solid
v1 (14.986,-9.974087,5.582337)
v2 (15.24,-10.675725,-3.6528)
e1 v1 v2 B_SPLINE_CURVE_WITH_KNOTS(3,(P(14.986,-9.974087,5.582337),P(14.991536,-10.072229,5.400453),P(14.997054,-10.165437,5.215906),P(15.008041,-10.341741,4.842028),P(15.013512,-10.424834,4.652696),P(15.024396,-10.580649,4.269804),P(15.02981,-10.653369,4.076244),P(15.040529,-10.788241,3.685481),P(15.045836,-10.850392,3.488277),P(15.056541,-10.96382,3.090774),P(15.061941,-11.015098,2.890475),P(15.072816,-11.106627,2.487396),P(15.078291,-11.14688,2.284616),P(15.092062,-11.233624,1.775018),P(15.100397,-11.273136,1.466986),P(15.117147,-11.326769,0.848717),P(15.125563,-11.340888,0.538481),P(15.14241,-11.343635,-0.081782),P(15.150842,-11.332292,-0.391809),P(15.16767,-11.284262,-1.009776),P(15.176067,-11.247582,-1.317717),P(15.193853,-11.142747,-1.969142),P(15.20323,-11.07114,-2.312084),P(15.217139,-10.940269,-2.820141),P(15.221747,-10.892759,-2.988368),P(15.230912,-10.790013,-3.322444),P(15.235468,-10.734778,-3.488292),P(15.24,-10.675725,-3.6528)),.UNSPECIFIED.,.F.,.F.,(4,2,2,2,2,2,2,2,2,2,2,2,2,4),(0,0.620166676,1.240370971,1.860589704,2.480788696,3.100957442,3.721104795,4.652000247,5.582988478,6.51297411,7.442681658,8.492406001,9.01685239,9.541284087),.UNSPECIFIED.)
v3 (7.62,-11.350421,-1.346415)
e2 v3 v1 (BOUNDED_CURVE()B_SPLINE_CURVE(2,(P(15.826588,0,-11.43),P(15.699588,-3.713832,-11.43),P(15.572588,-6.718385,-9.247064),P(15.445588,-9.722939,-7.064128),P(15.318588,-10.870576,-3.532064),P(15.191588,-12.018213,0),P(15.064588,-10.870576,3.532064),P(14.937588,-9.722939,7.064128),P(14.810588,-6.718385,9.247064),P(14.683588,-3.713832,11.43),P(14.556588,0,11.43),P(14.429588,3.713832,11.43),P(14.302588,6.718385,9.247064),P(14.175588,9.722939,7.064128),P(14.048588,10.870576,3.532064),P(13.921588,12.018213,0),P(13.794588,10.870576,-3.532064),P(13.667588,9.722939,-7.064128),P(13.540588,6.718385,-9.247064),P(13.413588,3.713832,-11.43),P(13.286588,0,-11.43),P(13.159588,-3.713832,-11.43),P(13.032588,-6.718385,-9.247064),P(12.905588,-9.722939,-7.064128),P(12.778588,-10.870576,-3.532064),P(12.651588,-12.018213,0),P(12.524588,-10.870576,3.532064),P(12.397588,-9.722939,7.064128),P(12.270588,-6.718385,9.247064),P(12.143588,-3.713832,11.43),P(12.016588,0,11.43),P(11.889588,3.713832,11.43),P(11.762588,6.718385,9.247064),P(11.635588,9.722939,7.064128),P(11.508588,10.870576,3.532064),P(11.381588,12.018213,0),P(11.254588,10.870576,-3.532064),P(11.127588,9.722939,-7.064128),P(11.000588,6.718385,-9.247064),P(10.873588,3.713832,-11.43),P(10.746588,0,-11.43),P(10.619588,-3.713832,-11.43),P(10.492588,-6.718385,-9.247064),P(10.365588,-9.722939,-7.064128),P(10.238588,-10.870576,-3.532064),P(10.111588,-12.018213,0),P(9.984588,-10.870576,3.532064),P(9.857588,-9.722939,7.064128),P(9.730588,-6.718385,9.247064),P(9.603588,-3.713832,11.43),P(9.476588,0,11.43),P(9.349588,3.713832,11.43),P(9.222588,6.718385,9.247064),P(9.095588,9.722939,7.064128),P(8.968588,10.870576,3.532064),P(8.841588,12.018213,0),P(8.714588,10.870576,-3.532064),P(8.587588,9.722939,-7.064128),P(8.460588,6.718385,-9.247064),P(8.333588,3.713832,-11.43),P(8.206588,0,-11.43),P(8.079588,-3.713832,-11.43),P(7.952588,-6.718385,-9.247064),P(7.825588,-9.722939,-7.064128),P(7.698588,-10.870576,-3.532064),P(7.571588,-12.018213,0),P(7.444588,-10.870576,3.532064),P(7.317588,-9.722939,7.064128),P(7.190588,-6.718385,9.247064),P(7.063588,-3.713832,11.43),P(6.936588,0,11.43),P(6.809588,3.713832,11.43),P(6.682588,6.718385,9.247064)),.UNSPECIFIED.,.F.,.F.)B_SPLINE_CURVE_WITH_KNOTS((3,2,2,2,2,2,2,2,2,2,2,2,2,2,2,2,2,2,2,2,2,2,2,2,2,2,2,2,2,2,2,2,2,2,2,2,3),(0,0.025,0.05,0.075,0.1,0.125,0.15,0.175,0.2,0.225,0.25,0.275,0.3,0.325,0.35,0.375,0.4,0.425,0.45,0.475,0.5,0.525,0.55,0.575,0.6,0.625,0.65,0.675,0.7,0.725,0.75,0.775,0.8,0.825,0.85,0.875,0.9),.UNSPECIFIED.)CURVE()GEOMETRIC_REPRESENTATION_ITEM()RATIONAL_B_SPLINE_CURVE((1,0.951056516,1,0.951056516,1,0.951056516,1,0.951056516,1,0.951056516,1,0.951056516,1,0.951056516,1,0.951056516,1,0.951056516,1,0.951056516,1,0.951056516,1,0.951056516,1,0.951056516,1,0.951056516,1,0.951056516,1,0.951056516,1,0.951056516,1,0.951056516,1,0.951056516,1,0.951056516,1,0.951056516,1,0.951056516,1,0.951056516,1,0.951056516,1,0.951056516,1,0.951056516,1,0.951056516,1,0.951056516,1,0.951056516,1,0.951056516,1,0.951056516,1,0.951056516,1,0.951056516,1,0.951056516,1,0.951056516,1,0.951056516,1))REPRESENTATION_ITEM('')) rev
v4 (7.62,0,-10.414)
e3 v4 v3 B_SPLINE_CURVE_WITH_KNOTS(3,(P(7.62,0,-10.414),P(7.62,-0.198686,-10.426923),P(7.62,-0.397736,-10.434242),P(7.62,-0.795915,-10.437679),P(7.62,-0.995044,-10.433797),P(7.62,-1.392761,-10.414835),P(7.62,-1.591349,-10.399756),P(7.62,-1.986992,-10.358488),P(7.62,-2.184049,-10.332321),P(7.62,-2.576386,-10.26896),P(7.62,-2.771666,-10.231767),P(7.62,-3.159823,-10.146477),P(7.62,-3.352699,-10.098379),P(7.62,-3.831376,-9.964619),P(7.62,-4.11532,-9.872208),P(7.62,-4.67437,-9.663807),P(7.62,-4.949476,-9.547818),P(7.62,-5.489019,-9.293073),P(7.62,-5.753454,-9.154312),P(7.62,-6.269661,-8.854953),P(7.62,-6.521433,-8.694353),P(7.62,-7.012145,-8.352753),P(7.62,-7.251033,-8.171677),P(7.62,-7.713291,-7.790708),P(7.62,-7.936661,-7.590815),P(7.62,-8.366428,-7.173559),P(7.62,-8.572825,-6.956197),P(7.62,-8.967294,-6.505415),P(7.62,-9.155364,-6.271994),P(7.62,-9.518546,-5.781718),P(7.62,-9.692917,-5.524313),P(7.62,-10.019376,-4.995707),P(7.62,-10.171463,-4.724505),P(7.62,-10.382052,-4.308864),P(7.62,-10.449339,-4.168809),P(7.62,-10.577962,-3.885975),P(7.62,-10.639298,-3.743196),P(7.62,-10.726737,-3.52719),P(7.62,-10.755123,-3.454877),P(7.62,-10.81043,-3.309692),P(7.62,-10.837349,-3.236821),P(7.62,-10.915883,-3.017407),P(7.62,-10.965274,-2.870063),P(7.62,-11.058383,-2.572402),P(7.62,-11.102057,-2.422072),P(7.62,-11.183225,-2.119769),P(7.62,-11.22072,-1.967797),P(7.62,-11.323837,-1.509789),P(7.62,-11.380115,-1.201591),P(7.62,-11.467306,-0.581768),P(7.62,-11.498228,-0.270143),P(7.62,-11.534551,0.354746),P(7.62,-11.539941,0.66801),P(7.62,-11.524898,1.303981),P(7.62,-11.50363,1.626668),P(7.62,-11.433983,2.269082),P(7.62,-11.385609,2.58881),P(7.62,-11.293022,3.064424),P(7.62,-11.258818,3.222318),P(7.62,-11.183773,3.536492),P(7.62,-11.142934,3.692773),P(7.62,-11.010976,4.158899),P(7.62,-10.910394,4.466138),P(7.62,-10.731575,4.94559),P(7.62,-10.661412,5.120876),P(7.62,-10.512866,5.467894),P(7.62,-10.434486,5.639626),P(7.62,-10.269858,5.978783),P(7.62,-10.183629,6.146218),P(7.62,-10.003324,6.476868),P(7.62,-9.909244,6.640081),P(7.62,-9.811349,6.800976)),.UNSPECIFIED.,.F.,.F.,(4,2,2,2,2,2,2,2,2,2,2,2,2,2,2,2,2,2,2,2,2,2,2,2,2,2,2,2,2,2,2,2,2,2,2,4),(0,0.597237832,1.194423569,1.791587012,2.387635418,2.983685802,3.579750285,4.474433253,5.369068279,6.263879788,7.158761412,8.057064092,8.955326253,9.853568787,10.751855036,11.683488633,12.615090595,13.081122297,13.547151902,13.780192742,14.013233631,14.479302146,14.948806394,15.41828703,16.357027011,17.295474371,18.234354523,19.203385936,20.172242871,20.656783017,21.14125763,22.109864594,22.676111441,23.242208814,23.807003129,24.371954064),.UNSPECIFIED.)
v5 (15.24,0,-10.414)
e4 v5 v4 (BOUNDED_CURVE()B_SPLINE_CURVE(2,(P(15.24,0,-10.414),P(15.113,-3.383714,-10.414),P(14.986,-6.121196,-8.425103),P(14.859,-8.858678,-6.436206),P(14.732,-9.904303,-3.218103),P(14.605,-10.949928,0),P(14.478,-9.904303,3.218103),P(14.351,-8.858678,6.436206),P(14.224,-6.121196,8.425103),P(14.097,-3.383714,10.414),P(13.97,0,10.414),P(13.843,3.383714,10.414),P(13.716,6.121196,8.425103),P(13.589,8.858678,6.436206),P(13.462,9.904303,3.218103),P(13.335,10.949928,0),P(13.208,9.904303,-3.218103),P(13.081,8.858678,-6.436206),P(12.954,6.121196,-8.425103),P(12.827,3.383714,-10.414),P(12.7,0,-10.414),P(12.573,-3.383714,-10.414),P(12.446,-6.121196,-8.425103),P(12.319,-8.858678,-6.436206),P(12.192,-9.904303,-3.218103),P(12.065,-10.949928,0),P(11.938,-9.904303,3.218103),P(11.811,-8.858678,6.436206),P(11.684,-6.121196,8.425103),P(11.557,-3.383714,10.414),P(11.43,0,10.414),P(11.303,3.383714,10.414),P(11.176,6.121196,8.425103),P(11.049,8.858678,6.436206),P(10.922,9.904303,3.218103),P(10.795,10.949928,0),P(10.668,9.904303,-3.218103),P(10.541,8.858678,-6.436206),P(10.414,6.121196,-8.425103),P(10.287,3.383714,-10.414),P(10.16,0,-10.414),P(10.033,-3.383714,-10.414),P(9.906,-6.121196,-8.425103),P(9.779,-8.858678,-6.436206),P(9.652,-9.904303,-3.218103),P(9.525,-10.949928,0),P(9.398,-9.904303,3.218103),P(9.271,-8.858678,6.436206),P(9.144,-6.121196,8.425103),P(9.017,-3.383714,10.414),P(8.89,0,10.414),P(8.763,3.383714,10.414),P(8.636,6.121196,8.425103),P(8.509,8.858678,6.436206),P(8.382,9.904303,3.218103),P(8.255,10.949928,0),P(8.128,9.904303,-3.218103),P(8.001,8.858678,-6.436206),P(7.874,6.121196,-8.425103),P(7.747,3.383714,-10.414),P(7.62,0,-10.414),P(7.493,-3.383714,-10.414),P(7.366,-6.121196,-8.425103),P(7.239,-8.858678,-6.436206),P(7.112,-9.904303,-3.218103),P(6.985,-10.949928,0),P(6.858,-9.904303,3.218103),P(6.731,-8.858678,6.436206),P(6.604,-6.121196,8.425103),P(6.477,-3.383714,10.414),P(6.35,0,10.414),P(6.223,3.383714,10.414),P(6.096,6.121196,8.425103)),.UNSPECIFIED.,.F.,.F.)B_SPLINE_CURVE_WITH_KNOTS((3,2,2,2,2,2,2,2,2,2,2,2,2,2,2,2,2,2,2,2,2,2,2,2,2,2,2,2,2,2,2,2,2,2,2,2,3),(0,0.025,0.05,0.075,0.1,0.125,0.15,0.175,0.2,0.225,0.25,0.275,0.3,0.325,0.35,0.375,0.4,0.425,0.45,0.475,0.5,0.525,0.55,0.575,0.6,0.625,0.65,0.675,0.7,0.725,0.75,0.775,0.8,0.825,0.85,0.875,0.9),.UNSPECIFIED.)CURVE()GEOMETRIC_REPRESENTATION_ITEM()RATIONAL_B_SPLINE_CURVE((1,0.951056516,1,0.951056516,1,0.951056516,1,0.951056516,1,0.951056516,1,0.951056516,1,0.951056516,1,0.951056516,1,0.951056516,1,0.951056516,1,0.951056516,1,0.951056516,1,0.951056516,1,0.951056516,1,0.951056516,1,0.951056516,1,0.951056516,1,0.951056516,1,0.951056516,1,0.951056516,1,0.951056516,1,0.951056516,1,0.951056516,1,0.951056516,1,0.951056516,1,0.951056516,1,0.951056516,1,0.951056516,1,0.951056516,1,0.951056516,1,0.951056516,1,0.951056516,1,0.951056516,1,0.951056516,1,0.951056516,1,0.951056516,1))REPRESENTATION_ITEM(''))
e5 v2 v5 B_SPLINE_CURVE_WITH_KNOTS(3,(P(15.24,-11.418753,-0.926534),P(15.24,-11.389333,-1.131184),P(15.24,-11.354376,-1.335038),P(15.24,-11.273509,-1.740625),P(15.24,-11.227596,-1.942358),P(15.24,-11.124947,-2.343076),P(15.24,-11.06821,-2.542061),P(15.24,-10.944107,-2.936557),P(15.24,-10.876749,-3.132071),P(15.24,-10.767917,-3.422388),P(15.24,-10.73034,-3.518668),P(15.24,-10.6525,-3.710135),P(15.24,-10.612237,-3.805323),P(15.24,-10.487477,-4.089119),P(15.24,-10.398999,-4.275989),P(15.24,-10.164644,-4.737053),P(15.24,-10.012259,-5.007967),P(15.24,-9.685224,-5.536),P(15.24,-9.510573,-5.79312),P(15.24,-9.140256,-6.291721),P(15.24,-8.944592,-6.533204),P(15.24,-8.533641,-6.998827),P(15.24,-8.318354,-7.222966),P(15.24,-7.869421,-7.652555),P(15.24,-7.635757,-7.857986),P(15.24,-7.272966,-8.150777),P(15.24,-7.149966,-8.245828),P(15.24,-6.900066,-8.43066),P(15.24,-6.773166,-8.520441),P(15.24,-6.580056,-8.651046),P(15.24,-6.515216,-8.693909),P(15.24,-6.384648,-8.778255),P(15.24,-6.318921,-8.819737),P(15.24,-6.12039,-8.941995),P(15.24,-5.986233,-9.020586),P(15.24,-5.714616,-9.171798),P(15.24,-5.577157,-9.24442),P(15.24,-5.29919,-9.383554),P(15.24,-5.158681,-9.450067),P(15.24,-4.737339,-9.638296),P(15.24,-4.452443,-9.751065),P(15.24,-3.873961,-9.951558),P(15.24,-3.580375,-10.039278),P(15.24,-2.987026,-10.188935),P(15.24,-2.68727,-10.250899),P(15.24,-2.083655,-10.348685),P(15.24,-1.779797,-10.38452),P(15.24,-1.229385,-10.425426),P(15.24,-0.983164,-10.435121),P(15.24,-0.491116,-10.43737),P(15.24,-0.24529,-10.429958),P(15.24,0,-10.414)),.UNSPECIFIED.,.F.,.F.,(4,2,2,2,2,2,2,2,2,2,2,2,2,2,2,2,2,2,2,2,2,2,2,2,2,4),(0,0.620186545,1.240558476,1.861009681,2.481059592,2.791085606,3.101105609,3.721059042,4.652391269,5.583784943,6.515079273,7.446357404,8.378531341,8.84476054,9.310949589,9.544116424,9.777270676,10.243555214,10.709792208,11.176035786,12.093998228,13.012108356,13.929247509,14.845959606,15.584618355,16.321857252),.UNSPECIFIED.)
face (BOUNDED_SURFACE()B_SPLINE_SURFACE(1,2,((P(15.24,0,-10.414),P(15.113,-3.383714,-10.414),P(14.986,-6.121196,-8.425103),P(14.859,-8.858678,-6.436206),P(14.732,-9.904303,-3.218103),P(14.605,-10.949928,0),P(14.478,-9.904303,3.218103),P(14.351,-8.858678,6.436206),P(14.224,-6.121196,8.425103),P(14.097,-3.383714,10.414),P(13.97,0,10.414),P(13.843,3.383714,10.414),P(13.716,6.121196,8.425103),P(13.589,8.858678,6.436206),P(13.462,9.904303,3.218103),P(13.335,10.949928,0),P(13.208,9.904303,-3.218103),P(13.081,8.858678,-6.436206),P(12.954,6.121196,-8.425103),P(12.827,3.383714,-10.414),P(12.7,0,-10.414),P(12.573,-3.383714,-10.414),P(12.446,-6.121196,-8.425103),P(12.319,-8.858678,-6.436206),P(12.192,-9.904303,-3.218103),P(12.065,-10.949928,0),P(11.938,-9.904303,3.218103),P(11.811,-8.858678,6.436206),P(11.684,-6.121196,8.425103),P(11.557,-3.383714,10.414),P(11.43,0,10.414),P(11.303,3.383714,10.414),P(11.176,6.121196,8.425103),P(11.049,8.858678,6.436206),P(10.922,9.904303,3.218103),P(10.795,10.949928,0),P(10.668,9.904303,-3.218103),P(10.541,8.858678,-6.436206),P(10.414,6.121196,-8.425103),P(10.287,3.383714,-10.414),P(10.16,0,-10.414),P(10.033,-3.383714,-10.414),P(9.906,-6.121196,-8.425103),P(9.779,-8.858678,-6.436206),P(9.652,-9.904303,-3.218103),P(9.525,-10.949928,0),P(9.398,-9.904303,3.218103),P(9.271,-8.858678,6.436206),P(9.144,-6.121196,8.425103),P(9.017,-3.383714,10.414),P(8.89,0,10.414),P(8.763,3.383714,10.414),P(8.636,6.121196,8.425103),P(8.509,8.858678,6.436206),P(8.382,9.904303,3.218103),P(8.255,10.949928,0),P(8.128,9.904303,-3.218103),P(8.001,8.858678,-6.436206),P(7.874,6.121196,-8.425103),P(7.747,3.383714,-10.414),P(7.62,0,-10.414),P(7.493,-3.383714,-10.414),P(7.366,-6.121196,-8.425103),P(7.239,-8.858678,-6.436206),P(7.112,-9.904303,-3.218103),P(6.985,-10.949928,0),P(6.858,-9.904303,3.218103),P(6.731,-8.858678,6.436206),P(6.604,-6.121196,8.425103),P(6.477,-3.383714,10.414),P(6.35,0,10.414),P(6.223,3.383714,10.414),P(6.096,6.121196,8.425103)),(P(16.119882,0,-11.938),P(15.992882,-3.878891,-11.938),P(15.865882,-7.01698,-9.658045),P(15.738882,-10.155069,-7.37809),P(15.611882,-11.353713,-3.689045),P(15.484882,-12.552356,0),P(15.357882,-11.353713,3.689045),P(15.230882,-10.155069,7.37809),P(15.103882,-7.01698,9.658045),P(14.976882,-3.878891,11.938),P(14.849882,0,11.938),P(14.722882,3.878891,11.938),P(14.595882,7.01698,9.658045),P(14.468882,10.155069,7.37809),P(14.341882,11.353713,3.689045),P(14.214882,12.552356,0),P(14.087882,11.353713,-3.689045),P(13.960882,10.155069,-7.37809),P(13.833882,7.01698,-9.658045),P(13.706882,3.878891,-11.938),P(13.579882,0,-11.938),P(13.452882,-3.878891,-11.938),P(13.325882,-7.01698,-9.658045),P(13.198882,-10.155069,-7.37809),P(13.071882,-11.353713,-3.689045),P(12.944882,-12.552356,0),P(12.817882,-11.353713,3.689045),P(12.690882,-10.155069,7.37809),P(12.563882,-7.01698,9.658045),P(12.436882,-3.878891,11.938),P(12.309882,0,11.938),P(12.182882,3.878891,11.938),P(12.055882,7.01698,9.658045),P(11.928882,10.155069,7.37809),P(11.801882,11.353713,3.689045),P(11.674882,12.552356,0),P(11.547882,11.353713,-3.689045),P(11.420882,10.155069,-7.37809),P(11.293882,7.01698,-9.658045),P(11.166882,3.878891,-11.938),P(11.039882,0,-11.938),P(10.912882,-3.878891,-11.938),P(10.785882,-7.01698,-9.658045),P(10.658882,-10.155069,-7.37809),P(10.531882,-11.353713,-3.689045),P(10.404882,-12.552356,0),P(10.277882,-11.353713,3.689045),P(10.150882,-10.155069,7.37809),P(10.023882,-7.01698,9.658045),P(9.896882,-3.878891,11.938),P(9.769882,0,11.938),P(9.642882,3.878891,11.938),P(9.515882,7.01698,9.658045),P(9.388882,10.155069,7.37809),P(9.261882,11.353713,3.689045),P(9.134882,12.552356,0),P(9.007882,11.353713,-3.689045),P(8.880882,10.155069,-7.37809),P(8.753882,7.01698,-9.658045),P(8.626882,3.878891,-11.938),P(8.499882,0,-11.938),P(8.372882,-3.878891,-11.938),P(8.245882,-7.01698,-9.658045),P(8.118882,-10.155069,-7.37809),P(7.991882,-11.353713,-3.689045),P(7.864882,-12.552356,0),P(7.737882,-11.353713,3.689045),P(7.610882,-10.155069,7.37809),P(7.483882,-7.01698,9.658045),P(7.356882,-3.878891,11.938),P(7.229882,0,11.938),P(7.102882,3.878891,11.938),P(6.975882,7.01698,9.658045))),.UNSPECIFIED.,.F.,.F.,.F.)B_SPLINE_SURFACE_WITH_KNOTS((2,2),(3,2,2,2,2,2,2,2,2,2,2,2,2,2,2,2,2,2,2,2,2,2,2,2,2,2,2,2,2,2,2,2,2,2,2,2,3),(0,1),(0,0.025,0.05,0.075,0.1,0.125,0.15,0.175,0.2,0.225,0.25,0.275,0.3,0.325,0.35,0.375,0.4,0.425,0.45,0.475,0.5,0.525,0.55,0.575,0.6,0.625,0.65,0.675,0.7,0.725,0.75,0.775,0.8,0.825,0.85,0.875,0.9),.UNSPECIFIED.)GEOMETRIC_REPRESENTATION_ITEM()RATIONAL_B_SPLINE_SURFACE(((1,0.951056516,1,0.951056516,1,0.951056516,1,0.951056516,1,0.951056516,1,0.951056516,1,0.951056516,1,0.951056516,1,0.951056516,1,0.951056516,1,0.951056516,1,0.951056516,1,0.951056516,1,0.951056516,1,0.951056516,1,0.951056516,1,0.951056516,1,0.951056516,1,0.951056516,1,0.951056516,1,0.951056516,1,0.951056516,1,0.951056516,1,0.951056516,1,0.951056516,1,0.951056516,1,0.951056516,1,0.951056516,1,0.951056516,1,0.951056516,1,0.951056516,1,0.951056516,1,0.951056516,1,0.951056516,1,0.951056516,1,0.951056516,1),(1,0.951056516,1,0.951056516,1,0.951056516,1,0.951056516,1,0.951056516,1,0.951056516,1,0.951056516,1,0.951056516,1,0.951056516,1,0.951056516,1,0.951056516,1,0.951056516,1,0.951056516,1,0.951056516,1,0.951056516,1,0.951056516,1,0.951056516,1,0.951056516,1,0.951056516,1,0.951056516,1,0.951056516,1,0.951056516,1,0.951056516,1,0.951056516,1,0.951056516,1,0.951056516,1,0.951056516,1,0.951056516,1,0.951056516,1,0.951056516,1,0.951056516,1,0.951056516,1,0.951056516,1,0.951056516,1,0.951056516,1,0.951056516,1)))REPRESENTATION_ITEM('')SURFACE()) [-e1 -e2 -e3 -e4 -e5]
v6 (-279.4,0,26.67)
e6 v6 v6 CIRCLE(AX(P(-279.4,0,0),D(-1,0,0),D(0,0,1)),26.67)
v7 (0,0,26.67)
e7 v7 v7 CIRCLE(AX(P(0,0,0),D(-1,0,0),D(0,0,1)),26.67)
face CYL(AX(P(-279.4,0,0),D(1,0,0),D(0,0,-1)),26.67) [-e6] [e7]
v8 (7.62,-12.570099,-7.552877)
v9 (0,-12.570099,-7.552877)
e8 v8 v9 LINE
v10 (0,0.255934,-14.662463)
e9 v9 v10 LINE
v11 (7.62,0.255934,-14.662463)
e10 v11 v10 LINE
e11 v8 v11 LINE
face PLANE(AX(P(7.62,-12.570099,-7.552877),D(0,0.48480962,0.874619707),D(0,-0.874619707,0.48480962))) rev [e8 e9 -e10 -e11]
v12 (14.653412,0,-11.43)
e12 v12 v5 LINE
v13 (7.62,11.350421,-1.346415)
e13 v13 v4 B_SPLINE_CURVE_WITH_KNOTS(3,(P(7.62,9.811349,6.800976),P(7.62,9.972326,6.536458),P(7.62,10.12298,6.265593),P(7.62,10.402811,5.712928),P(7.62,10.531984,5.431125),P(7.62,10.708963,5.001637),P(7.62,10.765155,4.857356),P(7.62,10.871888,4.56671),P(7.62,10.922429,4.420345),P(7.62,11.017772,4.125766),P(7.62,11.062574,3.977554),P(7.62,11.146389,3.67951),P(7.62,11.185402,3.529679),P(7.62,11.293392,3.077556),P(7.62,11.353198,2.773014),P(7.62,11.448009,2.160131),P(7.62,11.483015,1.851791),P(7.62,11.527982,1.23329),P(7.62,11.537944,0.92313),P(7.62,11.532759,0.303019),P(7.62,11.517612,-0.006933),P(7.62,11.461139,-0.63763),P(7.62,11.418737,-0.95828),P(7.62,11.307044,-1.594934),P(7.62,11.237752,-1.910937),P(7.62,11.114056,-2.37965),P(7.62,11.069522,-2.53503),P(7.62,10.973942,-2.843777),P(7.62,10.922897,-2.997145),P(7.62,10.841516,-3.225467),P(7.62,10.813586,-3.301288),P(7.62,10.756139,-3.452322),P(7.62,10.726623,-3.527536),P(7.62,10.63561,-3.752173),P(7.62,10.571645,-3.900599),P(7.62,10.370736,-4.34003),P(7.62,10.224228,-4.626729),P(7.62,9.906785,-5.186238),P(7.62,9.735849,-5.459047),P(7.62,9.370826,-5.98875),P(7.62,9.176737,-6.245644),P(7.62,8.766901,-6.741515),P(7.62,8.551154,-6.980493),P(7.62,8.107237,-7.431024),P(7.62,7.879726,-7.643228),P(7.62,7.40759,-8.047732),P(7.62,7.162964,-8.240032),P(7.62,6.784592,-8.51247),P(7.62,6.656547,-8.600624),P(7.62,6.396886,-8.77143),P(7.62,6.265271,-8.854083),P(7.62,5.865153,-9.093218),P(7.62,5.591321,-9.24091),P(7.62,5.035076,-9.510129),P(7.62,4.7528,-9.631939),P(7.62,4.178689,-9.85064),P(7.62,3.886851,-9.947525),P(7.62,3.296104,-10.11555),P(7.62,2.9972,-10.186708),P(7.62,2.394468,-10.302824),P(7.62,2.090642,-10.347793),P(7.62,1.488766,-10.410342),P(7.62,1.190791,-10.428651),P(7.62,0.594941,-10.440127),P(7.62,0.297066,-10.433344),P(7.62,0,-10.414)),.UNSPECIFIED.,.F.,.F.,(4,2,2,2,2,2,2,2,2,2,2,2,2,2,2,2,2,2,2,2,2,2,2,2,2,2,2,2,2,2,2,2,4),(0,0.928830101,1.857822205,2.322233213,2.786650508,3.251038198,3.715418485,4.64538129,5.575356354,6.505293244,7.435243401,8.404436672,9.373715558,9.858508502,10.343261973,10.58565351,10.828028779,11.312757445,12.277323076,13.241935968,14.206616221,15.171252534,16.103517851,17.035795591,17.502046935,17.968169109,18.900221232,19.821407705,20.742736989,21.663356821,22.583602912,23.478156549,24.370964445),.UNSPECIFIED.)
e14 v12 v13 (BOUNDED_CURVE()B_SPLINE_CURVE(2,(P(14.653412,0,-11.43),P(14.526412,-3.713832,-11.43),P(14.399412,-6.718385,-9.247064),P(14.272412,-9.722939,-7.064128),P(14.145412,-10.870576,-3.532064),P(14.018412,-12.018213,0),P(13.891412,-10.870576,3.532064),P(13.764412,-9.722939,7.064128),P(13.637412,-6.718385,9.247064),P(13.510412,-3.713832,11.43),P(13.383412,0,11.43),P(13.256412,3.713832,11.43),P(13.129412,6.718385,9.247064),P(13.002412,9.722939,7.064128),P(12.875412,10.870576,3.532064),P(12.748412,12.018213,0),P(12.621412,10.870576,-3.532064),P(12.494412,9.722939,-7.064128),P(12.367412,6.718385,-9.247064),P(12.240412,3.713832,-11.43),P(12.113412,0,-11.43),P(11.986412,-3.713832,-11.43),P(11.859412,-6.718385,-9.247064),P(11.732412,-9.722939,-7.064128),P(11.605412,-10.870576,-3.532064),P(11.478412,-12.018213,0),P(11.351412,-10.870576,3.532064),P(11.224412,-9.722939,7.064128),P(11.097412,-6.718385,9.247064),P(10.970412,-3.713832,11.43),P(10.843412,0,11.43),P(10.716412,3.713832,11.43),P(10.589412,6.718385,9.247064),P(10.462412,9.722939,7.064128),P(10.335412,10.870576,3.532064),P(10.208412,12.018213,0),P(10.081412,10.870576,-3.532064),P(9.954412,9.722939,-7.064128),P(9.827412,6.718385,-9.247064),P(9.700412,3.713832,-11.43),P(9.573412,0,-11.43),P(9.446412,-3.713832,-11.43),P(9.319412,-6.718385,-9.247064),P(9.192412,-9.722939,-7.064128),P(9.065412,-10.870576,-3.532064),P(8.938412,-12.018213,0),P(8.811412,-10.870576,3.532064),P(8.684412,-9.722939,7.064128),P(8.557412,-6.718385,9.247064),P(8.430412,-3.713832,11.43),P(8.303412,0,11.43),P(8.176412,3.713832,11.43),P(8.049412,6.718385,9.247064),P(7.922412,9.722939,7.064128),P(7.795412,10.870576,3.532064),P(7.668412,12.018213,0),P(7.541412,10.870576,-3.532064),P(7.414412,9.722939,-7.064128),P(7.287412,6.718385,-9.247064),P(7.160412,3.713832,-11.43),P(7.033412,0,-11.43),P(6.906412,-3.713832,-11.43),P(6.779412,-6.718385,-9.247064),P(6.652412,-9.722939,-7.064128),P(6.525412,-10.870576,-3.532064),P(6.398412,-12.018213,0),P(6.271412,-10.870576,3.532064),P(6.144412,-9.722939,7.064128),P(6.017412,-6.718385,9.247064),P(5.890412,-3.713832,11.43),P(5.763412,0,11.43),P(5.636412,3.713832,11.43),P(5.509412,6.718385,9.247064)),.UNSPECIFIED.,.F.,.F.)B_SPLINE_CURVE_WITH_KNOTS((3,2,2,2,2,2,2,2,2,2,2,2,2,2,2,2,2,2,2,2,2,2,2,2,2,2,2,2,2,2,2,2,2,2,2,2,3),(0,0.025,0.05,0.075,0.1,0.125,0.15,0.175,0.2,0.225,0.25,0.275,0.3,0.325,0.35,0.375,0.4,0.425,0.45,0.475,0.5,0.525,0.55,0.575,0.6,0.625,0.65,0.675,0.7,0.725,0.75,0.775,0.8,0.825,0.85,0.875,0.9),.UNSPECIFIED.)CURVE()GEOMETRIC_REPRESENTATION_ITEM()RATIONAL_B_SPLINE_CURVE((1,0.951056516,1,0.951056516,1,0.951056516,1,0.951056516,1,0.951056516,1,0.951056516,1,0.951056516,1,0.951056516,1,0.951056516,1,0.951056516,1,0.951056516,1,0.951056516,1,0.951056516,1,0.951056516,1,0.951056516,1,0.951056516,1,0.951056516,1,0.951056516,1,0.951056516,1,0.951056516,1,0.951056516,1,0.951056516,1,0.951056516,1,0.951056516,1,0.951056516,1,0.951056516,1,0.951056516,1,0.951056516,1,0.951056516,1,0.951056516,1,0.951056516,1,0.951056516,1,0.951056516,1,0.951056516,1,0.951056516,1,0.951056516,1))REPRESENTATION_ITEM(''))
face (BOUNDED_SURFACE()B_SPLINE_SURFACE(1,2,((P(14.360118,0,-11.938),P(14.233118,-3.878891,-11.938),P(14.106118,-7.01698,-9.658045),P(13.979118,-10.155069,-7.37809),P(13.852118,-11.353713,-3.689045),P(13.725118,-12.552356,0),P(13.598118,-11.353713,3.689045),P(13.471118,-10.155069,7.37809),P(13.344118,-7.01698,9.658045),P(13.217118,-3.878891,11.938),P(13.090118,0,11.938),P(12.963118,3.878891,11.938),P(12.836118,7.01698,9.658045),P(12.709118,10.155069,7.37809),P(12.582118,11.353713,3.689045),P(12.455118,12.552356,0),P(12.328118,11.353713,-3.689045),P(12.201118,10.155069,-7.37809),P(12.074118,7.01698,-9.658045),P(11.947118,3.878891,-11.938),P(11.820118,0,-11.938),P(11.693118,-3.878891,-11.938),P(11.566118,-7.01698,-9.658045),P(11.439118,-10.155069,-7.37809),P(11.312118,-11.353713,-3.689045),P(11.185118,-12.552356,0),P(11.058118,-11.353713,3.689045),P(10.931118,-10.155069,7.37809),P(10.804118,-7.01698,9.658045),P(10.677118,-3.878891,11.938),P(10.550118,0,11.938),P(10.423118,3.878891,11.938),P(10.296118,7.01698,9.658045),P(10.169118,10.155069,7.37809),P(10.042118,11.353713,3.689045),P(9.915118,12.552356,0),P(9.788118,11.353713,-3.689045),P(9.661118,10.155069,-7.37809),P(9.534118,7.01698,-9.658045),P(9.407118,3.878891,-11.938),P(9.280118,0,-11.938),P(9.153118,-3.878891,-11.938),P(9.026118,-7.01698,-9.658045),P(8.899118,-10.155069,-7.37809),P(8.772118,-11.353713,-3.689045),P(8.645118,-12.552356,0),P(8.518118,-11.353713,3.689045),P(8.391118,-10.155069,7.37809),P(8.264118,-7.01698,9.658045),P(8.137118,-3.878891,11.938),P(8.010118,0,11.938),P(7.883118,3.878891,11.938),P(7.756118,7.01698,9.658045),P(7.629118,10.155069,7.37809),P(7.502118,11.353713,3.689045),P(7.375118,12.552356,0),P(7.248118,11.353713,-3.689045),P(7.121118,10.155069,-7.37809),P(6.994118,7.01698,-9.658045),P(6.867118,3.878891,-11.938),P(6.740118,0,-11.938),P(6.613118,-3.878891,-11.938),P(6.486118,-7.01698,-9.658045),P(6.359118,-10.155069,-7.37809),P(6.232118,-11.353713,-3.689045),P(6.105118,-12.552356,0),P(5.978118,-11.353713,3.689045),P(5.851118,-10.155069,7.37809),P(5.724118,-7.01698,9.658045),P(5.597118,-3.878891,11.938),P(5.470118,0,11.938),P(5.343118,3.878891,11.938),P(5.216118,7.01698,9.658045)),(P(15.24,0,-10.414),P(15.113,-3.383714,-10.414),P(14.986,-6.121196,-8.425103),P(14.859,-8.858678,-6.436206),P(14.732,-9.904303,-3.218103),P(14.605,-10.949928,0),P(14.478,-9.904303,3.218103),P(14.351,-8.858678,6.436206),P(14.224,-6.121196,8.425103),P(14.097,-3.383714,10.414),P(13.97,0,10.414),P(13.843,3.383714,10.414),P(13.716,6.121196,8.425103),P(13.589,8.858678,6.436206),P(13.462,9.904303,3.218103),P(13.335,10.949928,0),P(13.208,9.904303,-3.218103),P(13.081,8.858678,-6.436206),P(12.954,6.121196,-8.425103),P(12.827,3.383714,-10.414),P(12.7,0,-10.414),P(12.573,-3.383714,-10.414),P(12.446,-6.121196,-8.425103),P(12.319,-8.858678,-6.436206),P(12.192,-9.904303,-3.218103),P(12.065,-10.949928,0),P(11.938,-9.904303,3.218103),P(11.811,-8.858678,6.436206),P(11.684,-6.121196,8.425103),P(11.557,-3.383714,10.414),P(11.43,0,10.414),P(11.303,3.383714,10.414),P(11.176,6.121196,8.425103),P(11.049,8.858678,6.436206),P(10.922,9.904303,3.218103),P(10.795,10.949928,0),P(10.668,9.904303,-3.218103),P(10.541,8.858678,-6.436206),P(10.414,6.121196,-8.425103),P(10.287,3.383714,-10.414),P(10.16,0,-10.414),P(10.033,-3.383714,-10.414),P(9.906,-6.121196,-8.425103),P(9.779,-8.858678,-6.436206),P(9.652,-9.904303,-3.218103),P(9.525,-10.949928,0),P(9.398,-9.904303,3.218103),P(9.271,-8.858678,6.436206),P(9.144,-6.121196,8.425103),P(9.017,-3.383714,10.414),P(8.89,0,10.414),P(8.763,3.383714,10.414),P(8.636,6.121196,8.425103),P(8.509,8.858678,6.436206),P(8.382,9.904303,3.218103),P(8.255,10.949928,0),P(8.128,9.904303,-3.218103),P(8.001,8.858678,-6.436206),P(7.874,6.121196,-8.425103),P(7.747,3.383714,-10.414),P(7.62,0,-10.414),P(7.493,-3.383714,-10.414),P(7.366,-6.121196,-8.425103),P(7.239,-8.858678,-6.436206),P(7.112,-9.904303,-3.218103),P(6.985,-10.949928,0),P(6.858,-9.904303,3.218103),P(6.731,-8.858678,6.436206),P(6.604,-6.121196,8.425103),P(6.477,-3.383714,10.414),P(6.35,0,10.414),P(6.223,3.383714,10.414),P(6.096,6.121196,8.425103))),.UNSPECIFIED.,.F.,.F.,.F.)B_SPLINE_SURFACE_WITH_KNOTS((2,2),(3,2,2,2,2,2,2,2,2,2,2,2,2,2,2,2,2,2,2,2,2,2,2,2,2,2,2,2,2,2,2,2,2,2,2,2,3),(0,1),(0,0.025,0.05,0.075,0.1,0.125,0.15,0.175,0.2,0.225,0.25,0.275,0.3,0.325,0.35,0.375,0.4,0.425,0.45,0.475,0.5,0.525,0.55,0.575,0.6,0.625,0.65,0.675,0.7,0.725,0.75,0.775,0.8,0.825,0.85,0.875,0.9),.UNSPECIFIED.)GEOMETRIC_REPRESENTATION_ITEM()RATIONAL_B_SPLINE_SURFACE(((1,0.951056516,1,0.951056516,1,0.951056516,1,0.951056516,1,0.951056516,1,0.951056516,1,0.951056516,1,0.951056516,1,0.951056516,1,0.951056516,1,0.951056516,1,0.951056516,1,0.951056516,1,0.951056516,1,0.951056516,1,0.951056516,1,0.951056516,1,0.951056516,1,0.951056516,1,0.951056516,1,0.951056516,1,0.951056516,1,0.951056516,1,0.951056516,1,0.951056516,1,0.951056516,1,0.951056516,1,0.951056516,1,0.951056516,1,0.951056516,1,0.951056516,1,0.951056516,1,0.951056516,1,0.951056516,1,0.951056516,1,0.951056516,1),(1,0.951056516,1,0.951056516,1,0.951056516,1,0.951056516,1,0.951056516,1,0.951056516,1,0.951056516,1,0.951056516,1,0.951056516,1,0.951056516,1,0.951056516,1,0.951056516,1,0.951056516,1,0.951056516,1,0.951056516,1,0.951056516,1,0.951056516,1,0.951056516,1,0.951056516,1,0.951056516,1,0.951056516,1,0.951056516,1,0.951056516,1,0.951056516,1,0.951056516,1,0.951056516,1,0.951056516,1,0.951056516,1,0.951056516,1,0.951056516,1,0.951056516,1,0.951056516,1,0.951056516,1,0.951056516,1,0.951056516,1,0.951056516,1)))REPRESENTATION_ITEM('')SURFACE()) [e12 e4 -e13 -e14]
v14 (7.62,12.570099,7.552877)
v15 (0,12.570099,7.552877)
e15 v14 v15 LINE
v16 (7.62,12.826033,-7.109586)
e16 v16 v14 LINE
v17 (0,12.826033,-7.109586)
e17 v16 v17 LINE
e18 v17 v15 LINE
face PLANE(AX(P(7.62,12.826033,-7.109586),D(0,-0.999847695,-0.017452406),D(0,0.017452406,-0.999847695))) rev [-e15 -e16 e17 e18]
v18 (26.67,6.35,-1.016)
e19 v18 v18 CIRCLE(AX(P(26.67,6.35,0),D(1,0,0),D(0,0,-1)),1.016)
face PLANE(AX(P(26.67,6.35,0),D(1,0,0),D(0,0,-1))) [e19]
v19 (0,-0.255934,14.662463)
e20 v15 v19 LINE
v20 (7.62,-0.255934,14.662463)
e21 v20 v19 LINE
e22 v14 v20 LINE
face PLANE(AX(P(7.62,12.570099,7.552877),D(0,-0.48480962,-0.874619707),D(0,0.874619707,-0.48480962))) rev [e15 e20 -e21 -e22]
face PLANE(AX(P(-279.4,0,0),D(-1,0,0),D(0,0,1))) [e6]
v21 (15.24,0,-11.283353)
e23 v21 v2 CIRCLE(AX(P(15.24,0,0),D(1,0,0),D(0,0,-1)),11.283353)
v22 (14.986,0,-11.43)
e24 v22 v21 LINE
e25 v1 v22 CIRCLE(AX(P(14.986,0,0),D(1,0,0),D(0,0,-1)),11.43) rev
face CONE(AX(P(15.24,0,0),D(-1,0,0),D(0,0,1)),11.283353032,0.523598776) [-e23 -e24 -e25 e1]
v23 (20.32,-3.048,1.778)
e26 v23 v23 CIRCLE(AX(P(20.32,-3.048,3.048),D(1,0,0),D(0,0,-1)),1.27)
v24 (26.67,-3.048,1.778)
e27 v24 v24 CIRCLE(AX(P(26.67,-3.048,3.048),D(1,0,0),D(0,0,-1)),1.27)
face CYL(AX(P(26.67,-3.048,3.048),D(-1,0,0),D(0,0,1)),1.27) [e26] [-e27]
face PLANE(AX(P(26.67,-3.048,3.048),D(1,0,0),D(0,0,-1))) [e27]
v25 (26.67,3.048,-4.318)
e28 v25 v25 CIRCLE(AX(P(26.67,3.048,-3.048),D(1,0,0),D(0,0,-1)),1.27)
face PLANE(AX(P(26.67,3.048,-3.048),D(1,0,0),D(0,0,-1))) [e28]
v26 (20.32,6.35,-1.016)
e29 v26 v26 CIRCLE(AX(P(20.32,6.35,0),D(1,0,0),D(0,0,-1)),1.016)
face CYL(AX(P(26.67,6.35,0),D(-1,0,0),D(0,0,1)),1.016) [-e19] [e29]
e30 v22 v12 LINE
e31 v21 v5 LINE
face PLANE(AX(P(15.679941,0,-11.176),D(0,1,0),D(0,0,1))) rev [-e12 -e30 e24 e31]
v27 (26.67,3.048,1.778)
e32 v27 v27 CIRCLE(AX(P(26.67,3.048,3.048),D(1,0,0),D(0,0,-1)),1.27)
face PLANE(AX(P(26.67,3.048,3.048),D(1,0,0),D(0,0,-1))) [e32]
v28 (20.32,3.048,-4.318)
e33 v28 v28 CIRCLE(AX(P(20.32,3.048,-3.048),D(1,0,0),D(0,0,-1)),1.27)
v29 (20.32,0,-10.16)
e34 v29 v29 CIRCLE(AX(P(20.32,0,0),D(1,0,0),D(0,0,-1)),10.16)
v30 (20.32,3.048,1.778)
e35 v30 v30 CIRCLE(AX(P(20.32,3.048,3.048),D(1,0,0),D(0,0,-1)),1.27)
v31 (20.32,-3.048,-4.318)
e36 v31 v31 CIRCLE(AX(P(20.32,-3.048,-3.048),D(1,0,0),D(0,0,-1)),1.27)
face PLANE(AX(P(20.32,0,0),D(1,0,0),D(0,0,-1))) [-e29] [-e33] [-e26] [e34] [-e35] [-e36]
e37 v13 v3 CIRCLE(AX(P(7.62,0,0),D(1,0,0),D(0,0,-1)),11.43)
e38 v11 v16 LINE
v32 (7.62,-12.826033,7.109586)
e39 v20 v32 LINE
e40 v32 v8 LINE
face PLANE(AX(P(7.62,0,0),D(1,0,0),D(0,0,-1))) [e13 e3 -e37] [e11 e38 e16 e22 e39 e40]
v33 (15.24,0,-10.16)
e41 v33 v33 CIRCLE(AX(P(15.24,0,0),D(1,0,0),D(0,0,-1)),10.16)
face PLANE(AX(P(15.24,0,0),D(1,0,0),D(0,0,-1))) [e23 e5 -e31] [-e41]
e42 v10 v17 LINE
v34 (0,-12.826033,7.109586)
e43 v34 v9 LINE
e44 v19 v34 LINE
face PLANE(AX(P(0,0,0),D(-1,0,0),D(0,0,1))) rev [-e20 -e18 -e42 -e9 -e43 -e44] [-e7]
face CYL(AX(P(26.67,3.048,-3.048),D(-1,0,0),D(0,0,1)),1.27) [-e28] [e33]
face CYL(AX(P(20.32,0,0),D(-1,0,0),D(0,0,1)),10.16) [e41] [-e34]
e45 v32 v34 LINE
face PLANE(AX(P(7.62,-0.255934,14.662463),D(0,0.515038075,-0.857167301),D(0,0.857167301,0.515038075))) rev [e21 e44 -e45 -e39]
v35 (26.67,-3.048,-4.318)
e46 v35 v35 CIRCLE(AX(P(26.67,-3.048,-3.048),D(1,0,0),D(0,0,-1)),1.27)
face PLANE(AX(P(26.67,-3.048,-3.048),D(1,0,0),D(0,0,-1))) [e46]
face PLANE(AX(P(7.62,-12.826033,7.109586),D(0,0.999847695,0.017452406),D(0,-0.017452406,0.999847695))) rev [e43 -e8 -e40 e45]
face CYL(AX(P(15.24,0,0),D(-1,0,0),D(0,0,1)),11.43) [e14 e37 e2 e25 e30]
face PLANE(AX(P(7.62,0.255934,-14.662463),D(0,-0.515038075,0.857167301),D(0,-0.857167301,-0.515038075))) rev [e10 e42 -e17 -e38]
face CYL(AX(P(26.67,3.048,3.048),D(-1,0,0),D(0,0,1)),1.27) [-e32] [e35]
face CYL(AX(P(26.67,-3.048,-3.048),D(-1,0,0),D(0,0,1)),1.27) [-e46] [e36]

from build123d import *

# Parameters (mm, degrees)
BOSS_EXTRUDE1_DEPTH = 7.62
SKETCH4_R           = 10.16
BOSS_EXTRUDE2_DEPTH = 12.7
SKETCH5_R           = 11.43
SKETCH5_R_2         = 10.16
EXTRUDE_THIN1_DEPTH = 7.62
CHAMFER2_SIZE       = 0.254
CHAMFER2_SIZE2      = 0.146646968
CUT_SWEEP4_PITCH    = 2.54
CUT_SWEEP4_TO       = 7.62
SKETCH10_R          = 26.67
BOSS_EXTRUDE3_DEPTH = 279.4
SKETCH11_R          = 1.27
BOSS_EXTRUDE4_DEPTH = 6.35
SKETCH12_R          = 1.27
BOSS_EXTRUDE5_DEPTH = 6.35
SKETCH13_R          = 1.27
BOSS_EXTRUDE6_DEPTH = 6.35
SKETCH14_R          = 1.27
BOSS_EXTRUDE7_DEPTH = 6.35
SKETCH16_R          = 1.016
BOSS_EXTRUDE8_DEPTH = 6.35
SKETCH17_R          = 26.67
BOSS_EXTRUDE9_DEPTH = 127


with BuildPart() as part:
    # Sketch3 → Boss-Extrude1 (new body)
    with BuildSketch(Plane(origin=(0, 0, 0), x_dir=(0, 0, -1), z_dir=(1, 0, 0))):
        Polygon((14.662463333, 0.255934249), (7.109586105, 12.826032853), (-7.552877228, 12.570098604), (-14.662463333, -0.255934249), (-7.109586105, -12.826032853), (7.552877228, -12.570098604), align=None)
    extrude(amount=BOSS_EXTRUDE1_DEPTH)

    # Sketch4 → Boss-Extrude2 (add)
    with BuildSketch(Plane(origin=(7.62, 0, 0), x_dir=(0, 0, -1), z_dir=(1, 0, 0))):
        Circle(SKETCH4_R)
    extrude(amount=BOSS_EXTRUDE2_DEPTH)

    # Sketch5 → Extrude-Thin1 (add)
    with BuildSketch(Plane(origin=(7.62, 0, 0), x_dir=(0, 0, -1), z_dir=(1, 0, 0))):
        Circle(SKETCH5_R)
        Circle(SKETCH5_R_2, mode=Mode.SUBTRACT)
    extrude(amount=EXTRUDE_THIN1_DEPTH)

    # Chamfer2
    chamfer2_edges = [part.edges().sort_by_distance(p)[0] for p in [
        (15.24, 0, 11.43),
    ]]
    chamfer2_side = [part.faces().sort_by_distance(p)[0] for p in [
        (11.43, 0, 11.43),
    ]]
    chamfer(chamfer2_edges, length=CHAMFER2_SIZE, length2=CHAMFER2_SIZE2, reference=chamfer2_side[0])

    # Cut-Sweep4: arcs per turn and ends read off the stored shape
    # Cut-Sweep4: the profile of Sketch9 screwed along a right-hand helix through 3.6 turns, 10 arcs to a turn; built about Z, then put on its axis
    cut_sweep4_z = Axis((0, 0, 0), (0, 0, 1))
    cut_sweep4_corners = [(10.414, 0, 0), (11.938, 0, -0.87988181), (11.938, 0, 0.87988181)]
    with BuildLine(mode=Mode.PRIVATE) as cut_sweep4_profile:
        Line(cut_sweep4_corners[0], cut_sweep4_corners[1])
        Line(cut_sweep4_corners[1], cut_sweep4_corners[2])
        Line(cut_sweep4_corners[2], cut_sweep4_corners[0])
    cut_sweep4_cap = Face(cut_sweep4_profile.wire())
    cut_sweep4_turn_angles = [0, 18, 36, 54, 72, 90, 108, 126, 144, 162, 180, 198, 216, 234, 252, 270, 288, 306, 324, 342, 360]
    cut_sweep4_turn_weights = [1, 0.9510565162951535, 1, 0.9510565162951535, 1, 0.9510565162951535, 1, 0.9510565162951535, 1, 0.9510565162951535, 1, 0.9510565162951535, 1, 0.9510565162951535, 1, 0.9510565162951535, 1, 0.9510565162951535, 1, 0.9510565162951535, 1]
    cut_sweep4_turn_rails = [Edge.make_bspline([Vector(p[0], p[1], 0).rotate(cut_sweep4_z, cut_sweep4_turn_angles[k]) / cut_sweep4_turn_weights[k] + Vector(0, 0, p[2] + CUT_SWEEP4_PITCH * cut_sweep4_turn_angles[k] / 360) for k in range(21)], [0, 0, 0, 1, 1, 2, 2, 3, 3, 4, 4, 5, 5, 6, 6, 7, 7, 8, 8, 9, 9, 10, 10, 10], 2, cut_sweep4_turn_weights) for p in cut_sweep4_corners]
    cut_sweep4_turn_sides = [Face.make_surface_from_curves(cut_sweep4_turn_rails[p[0]], cut_sweep4_turn_rails[p[1]]) for p in [(0, 1), (1, 2), (2, 0)]]
    cut_sweep4_last_angles = [1080, 1098, 1116, 1134, 1152, 1170, 1188, 1206, 1224, 1242, 1260, 1278, 1296]
    cut_sweep4_last_weights = [1, 0.9510565162951535, 1, 0.9510565162951535, 1, 0.9510565162951535, 1, 0.9510565162951535, 1, 0.9510565162951535, 1, 0.9510565162951535, 1]
    cut_sweep4_last_rails = [Edge.make_bspline([Vector(p[0], p[1], 0).rotate(cut_sweep4_z, cut_sweep4_last_angles[k]) / cut_sweep4_last_weights[k] + Vector(0, 0, p[2] + CUT_SWEEP4_PITCH * cut_sweep4_last_angles[k] / 360) for k in range(13)], [0, 0, 0, 1, 1, 2, 2, 3, 3, 4, 4, 5, 5, 6, 6, 6], 2, cut_sweep4_last_weights) for p in cut_sweep4_corners]
    cut_sweep4_last_sides = [Face.make_surface_from_curves(cut_sweep4_last_rails[p[0]], cut_sweep4_last_rails[p[1]]) for p in [(0, 1), (1, 2), (2, 0)]]
    cut_sweep4 = Plane(origin=(15.24, 0, 0), x_dir=(0, 0, -1), z_dir=(-1, 0, 0)) * split(Solid(Shell([*[p.moved(Location((0, 0, CUT_SWEEP4_PITCH * i))) for i in range(3) for p in cut_sweep4_turn_sides], *cut_sweep4_last_sides, cut_sweep4_cap, cut_sweep4_cap.rotate(cut_sweep4_z, 1296).moved(Location((0, 0, CUT_SWEEP4_PITCH * 1296 / 360)))])), bisect_by=Plane.XY.offset(CUT_SWEEP4_TO), keep=Keep.BOTTOM, mode=Mode.PRIVATE)
    add(cut_sweep4, mode=Mode.SUBTRACT)

    # Sketch10 → Boss-Extrude3 (add)
    with BuildSketch(Plane.ZY):
        Circle(SKETCH10_R)
    extrude(amount=BOSS_EXTRUDE3_DEPTH)

    # Sketch11 → Boss-Extrude4 (add)
    with BuildSketch(Plane(origin=(20.32, 0, 0), x_dir=(0, 0, -1), z_dir=(1, 0, 0))):
        with Locations((-3.048, 3.048)):
            Circle(SKETCH11_R)
    extrude(amount=BOSS_EXTRUDE4_DEPTH)

    # Sketch12 → Boss-Extrude5 (add)
    with BuildSketch(Plane(origin=(20.32, 0, 0), x_dir=(0, 0, -1), z_dir=(1, 0, 0))):
        with Locations((3.048, 3.048)):
            Circle(SKETCH12_R)
    extrude(amount=BOSS_EXTRUDE5_DEPTH)

    # Sketch13 → Boss-Extrude6 (add)
    with BuildSketch(Plane(origin=(20.32, 0, 0), x_dir=(0, 0, -1), z_dir=(1, 0, 0))):
        with Locations((3.048, -3.048)):
            Circle(SKETCH13_R)
    extrude(amount=BOSS_EXTRUDE6_DEPTH)

    # Sketch14 → Boss-Extrude7 (add)
    with BuildSketch(Plane(origin=(20.32, 0, 0), x_dir=(0, 0, -1), z_dir=(1, 0, 0))):
        with Locations((-3.048, -3.048)):
            Circle(SKETCH14_R)
    extrude(amount=BOSS_EXTRUDE7_DEPTH)

    # Sketch16 → Boss-Extrude8 (add)
    with BuildSketch(Plane(origin=(20.32, 0, 0), x_dir=(0, 0, -1), z_dir=(1, 0, 0))):
        with Locations((0, 6.35)):
            Circle(SKETCH16_R)
    extrude(amount=BOSS_EXTRUDE8_DEPTH)

    # Sketch17 → Boss-Extrude9 (add)
    with BuildSketch(Plane(origin=(0, 0, 0), x_dir=(0, 0, -1), z_dir=(1, 0, 0))):
        with Locations(Location((0, 0, 0), (0, 0, 180))):
            Circle(SKETCH17_R)
    extrude(amount=-BOSS_EXTRUDE9_DEPTH)


solid = part.part
